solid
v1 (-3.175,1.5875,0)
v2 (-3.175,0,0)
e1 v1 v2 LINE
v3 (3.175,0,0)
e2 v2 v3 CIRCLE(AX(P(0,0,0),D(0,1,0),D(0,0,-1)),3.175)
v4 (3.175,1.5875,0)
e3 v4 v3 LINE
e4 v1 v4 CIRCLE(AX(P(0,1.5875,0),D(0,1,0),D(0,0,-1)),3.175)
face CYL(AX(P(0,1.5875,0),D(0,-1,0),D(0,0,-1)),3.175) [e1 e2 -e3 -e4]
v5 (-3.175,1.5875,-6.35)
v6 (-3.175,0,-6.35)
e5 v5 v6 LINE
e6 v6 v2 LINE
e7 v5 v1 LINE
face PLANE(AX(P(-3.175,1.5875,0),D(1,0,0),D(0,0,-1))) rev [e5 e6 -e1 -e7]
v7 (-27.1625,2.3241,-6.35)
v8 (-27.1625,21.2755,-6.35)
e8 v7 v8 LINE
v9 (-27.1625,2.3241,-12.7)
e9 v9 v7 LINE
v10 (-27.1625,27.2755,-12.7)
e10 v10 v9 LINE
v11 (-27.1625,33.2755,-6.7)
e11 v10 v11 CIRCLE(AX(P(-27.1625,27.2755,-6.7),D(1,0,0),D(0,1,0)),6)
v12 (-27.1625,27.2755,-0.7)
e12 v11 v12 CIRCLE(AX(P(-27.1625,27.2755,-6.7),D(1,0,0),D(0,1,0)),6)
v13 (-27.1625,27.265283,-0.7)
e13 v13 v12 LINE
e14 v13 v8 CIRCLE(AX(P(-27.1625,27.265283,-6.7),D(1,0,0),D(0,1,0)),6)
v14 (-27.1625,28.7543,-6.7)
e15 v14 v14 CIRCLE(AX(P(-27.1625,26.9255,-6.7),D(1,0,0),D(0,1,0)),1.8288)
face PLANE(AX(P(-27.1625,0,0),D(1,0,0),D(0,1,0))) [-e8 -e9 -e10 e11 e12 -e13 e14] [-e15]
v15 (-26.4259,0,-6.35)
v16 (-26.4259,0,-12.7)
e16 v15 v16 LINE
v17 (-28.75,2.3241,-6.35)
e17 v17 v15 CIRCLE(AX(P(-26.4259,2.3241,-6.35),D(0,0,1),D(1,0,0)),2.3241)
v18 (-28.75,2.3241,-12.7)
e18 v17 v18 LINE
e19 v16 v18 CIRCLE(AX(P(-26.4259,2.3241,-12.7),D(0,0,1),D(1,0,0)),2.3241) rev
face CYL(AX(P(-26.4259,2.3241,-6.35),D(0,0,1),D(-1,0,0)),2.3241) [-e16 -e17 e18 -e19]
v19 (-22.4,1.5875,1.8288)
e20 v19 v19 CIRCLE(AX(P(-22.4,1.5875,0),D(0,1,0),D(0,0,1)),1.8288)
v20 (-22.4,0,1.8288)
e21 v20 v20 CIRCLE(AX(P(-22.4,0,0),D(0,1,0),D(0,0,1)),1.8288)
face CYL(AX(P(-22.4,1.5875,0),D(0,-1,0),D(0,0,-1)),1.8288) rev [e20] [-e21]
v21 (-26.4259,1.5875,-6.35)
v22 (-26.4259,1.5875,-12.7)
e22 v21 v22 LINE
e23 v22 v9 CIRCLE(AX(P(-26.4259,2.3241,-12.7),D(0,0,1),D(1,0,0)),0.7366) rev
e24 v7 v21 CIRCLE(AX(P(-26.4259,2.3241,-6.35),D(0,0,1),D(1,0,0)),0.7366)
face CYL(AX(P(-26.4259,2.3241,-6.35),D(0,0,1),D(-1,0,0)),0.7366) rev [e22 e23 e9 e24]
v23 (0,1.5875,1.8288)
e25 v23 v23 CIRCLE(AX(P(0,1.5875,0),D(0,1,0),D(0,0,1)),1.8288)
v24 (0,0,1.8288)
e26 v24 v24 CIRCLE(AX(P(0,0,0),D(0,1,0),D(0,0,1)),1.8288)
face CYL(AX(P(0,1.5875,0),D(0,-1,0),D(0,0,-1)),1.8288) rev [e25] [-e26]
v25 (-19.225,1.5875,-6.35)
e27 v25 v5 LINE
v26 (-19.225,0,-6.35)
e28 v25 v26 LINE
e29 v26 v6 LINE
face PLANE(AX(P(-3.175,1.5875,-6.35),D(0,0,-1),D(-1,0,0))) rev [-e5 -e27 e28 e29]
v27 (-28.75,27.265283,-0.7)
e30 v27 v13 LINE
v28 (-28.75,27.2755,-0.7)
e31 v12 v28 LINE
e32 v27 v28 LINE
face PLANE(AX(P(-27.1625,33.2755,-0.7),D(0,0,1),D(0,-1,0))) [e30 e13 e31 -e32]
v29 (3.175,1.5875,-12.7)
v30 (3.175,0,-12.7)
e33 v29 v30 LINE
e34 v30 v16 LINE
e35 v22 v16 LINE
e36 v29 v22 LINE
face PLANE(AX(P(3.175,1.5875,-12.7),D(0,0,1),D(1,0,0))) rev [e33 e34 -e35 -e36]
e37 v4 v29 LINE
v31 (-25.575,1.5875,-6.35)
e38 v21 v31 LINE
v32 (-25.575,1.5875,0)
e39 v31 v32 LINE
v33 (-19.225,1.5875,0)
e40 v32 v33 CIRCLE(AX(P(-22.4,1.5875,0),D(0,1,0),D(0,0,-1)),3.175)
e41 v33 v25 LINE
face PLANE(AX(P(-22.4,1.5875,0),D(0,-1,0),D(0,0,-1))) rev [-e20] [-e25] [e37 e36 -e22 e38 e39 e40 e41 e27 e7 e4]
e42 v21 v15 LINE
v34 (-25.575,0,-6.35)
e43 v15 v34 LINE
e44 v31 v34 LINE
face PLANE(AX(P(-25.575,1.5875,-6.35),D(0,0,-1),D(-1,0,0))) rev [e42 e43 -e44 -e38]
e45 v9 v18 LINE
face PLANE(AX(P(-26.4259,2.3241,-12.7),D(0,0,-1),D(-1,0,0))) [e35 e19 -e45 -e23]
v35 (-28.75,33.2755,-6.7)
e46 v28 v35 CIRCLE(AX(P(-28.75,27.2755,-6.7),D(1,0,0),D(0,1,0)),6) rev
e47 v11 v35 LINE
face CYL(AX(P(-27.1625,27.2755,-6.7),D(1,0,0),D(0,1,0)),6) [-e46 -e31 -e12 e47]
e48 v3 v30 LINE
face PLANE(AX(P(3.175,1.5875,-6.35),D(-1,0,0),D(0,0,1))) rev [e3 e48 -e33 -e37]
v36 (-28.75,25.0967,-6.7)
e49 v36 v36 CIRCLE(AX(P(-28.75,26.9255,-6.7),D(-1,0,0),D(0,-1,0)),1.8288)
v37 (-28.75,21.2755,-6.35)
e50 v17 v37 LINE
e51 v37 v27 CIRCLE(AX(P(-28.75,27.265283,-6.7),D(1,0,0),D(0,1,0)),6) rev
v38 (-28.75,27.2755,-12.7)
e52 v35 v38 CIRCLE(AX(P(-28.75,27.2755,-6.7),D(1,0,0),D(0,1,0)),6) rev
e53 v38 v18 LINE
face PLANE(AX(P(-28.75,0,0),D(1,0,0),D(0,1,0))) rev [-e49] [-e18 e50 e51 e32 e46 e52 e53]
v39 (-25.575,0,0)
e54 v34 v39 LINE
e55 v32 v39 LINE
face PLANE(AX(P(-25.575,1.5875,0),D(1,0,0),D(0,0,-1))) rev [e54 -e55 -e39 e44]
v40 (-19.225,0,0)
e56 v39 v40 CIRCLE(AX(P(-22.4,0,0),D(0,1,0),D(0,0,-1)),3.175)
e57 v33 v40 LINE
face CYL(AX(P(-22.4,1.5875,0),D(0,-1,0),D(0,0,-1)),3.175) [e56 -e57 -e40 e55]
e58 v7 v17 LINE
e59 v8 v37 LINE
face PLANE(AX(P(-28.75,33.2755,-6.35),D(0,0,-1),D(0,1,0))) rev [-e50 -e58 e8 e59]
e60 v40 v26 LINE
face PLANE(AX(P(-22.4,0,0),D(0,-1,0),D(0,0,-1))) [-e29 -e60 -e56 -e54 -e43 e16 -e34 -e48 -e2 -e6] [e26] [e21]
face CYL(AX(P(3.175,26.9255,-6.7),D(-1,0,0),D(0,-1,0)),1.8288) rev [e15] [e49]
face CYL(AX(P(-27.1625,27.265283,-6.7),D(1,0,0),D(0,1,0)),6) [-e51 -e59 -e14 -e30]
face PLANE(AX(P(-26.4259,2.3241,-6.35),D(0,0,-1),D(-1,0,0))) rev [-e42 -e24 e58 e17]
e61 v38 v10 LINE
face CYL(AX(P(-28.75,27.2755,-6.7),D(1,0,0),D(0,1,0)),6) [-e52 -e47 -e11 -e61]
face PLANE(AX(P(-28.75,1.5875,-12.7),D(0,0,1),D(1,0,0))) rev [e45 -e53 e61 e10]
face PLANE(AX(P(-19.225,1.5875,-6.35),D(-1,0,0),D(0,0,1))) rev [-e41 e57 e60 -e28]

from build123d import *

# Parameters (mm, degrees)
SKETCH1_R                    = 1.8288
BASE_FLANGE1_DEPTH           = 1.5875
EDGE_FLANGE2_STRIP_W         = 7.8232
EDGE_FLANGE2_STRIP_H         = 1.5875
EDGE_FLANGE2_STRIP_CUT_DEPTH = 6.35
EDGE_FLANGE2_DEPTH           = 6.35
SKETCH19_W                   = 5.65
SKETCH19_H                   = 12
TAB1_DEPTH                   = 1.5875
HOLE1_START                  = -28.75
HOLE1_OUTLINE_R              = 1.8288
HOLE1_DEPTH                  = 1.5875
FILLET1_R                    = 6


# Read off the part's stored shape, not the designer's step: Hole1
# Sheet-metal steps are written as plain solids
with BuildPart() as part:
    # Sketch1 → Base-Flange1 (new body)
    with BuildSketch(Plane(origin=(0, 0, 0), x_dir=(1, 0, 0), z_dir=(0, 1, 0))):
        with BuildLine():
            Line((-25.575, 0), (-25.575, 6.35))
            Line((-25.575, 6.35), (-27.1625, 6.35))
            Line((-27.1625, 6.35), (-27.1625, 12.7))
            Line((-27.1625, 12.7), (3.175, 12.7))
            Line((3.175, 12.7), (3.175, 6.35))
            Line((3.175, 6.35), (3.175, 0))
            ThreePointArc((3.175, 0), (0, -3.175), (-3.175, 0))
            Line((-3.175, 0), (-3.175, 6.35))
            Line((-3.175, 6.35), (-19.225, 6.35))
            Line((-19.225, 6.35), (-19.225, 0))
            ThreePointArc((-19.225, 0), (-22.4, -3.175), (-25.575, 0))
        make_face()
        with Locations(Location((0, 0, 0), (0, 0, 270))):
            Circle(SKETCH1_R, mode=Mode.SUBTRACT)
        with Locations(Location((-22.4, 0, 0), (0, 0, 270))):
            Circle(SKETCH1_R, mode=Mode.SUBTRACT)
    extrude(amount=BASE_FLANGE1_DEPTH)

    # Edge-Flange2 strip (across the edge) → Edge-Flange2 strip cut (cut)
    with BuildSketch(Plane(origin=(-27.1625, 1.5875, -12.7), x_dir=(1, 0, 0), z_dir=(0, 0, 1))):
        with Locations((-3.175, -0.79375)):
            Rectangle(EDGE_FLANGE2_STRIP_W, EDGE_FLANGE2_STRIP_H)
    extrude(amount=EDGE_FLANGE2_STRIP_CUT_DEPTH, mode=Mode.SUBTRACT)

    # Edge-Flange2 section (across the edge) → Edge-Flange2 (add)
    with BuildSketch(Plane(origin=(-27.1625, 1.5875, -12.7), x_dir=(1, 0, 0), z_dir=(0, 0, 1))):
        with BuildLine():
            Line((-1.5875, 0.7366), (-1.5875, 31.688))
            Line((-1.5875, 31.688), (0, 31.688))
            Line((0, 31.688), (0, 0.7366))
            ThreePointArc((0, 0.7366), (0.215745145, 0.215745145), (0.7366, 0))
            Line((0.7366, 0), (0.7366, -1.5875))
            ThreePointArc((0.7366, -1.5875), (-0.90678687, -0.90678687), (-1.5875, 0.7366))
        make_face()
    extrude(amount=EDGE_FLANGE2_DEPTH)

    # Sketch19 → Tab1 (add)
    with BuildSketch(Plane.ZY.offset(28.75)):
        with Locations((-3.525, 27.2755)):
            Rectangle(SKETCH19_W, SKETCH19_H)
    extrude(amount=-TAB1_DEPTH)

    # Hole1 outline → Hole1 (cut)
    with BuildSketch(Plane.YZ.offset(HOLE1_START)):
        with Locations((26.9255, -6.7)):
            Circle(HOLE1_OUTLINE_R)
    extrude(amount=HOLE1_DEPTH, mode=Mode.SUBTRACT)

    # Fillet1
    # the kernel refuses this fillet: 6 mm, written as the material it takes off along each edge
    with BuildSketch(Plane(origin=(-43.724457419, 21.2755, -0.7), x_dir=(0, 0, -1), z_dir=(1, 0, 0))) as fillet1_piece_1:
        with BuildLine():
            CenterArc((6, 5.989782968), FILLET1_R, 180, 86.655847796)
            Line((0, 5.989782968), (-0.12, 5.989782968))
            Line((-0.12, 5.989782968), (-0.12, 0))
            Line((-0.12, 0), (0, -0.12))
            ThreePointArc((0, -0.12), (2.825, -0.12), (5.643, -0.119795659))
            Line((5.643, -0.119795659), (5.65, 0))
        make_face()
    extrude(amount=31.536414838, mode=Mode.SUBTRACT)
    with BuildSketch(Plane(origin=(-43.75, 33.2755, -0.7), x_dir=(0, 0, -1), z_dir=(1, 0, 0)), Plane(origin=(-43.75, 33.2755, -12.7), x_dir=(0, -1, 0), z_dir=(1, 0, 0))) as fillet1_piece_2:
        with BuildLine():
            CenterArc((FILLET1_R, -FILLET1_R), FILLET1_R, 90, 90)
            Line((0, -FILLET1_R), (-FILLET1_R * 0.02, -FILLET1_R))
            Line((-FILLET1_R * 0.02, -FILLET1_R), (-FILLET1_R * 0.02, FILLET1_R * 0.02))
            Line((-FILLET1_R * 0.02, FILLET1_R * 0.02), (FILLET1_R, FILLET1_R * 0.02))
            Line((FILLET1_R, FILLET1_R * 0.02), (FILLET1_R, 0))
        make_face()
    extrude(amount=31.5875, mode=Mode.SUBTRACT)


solid = part.part
